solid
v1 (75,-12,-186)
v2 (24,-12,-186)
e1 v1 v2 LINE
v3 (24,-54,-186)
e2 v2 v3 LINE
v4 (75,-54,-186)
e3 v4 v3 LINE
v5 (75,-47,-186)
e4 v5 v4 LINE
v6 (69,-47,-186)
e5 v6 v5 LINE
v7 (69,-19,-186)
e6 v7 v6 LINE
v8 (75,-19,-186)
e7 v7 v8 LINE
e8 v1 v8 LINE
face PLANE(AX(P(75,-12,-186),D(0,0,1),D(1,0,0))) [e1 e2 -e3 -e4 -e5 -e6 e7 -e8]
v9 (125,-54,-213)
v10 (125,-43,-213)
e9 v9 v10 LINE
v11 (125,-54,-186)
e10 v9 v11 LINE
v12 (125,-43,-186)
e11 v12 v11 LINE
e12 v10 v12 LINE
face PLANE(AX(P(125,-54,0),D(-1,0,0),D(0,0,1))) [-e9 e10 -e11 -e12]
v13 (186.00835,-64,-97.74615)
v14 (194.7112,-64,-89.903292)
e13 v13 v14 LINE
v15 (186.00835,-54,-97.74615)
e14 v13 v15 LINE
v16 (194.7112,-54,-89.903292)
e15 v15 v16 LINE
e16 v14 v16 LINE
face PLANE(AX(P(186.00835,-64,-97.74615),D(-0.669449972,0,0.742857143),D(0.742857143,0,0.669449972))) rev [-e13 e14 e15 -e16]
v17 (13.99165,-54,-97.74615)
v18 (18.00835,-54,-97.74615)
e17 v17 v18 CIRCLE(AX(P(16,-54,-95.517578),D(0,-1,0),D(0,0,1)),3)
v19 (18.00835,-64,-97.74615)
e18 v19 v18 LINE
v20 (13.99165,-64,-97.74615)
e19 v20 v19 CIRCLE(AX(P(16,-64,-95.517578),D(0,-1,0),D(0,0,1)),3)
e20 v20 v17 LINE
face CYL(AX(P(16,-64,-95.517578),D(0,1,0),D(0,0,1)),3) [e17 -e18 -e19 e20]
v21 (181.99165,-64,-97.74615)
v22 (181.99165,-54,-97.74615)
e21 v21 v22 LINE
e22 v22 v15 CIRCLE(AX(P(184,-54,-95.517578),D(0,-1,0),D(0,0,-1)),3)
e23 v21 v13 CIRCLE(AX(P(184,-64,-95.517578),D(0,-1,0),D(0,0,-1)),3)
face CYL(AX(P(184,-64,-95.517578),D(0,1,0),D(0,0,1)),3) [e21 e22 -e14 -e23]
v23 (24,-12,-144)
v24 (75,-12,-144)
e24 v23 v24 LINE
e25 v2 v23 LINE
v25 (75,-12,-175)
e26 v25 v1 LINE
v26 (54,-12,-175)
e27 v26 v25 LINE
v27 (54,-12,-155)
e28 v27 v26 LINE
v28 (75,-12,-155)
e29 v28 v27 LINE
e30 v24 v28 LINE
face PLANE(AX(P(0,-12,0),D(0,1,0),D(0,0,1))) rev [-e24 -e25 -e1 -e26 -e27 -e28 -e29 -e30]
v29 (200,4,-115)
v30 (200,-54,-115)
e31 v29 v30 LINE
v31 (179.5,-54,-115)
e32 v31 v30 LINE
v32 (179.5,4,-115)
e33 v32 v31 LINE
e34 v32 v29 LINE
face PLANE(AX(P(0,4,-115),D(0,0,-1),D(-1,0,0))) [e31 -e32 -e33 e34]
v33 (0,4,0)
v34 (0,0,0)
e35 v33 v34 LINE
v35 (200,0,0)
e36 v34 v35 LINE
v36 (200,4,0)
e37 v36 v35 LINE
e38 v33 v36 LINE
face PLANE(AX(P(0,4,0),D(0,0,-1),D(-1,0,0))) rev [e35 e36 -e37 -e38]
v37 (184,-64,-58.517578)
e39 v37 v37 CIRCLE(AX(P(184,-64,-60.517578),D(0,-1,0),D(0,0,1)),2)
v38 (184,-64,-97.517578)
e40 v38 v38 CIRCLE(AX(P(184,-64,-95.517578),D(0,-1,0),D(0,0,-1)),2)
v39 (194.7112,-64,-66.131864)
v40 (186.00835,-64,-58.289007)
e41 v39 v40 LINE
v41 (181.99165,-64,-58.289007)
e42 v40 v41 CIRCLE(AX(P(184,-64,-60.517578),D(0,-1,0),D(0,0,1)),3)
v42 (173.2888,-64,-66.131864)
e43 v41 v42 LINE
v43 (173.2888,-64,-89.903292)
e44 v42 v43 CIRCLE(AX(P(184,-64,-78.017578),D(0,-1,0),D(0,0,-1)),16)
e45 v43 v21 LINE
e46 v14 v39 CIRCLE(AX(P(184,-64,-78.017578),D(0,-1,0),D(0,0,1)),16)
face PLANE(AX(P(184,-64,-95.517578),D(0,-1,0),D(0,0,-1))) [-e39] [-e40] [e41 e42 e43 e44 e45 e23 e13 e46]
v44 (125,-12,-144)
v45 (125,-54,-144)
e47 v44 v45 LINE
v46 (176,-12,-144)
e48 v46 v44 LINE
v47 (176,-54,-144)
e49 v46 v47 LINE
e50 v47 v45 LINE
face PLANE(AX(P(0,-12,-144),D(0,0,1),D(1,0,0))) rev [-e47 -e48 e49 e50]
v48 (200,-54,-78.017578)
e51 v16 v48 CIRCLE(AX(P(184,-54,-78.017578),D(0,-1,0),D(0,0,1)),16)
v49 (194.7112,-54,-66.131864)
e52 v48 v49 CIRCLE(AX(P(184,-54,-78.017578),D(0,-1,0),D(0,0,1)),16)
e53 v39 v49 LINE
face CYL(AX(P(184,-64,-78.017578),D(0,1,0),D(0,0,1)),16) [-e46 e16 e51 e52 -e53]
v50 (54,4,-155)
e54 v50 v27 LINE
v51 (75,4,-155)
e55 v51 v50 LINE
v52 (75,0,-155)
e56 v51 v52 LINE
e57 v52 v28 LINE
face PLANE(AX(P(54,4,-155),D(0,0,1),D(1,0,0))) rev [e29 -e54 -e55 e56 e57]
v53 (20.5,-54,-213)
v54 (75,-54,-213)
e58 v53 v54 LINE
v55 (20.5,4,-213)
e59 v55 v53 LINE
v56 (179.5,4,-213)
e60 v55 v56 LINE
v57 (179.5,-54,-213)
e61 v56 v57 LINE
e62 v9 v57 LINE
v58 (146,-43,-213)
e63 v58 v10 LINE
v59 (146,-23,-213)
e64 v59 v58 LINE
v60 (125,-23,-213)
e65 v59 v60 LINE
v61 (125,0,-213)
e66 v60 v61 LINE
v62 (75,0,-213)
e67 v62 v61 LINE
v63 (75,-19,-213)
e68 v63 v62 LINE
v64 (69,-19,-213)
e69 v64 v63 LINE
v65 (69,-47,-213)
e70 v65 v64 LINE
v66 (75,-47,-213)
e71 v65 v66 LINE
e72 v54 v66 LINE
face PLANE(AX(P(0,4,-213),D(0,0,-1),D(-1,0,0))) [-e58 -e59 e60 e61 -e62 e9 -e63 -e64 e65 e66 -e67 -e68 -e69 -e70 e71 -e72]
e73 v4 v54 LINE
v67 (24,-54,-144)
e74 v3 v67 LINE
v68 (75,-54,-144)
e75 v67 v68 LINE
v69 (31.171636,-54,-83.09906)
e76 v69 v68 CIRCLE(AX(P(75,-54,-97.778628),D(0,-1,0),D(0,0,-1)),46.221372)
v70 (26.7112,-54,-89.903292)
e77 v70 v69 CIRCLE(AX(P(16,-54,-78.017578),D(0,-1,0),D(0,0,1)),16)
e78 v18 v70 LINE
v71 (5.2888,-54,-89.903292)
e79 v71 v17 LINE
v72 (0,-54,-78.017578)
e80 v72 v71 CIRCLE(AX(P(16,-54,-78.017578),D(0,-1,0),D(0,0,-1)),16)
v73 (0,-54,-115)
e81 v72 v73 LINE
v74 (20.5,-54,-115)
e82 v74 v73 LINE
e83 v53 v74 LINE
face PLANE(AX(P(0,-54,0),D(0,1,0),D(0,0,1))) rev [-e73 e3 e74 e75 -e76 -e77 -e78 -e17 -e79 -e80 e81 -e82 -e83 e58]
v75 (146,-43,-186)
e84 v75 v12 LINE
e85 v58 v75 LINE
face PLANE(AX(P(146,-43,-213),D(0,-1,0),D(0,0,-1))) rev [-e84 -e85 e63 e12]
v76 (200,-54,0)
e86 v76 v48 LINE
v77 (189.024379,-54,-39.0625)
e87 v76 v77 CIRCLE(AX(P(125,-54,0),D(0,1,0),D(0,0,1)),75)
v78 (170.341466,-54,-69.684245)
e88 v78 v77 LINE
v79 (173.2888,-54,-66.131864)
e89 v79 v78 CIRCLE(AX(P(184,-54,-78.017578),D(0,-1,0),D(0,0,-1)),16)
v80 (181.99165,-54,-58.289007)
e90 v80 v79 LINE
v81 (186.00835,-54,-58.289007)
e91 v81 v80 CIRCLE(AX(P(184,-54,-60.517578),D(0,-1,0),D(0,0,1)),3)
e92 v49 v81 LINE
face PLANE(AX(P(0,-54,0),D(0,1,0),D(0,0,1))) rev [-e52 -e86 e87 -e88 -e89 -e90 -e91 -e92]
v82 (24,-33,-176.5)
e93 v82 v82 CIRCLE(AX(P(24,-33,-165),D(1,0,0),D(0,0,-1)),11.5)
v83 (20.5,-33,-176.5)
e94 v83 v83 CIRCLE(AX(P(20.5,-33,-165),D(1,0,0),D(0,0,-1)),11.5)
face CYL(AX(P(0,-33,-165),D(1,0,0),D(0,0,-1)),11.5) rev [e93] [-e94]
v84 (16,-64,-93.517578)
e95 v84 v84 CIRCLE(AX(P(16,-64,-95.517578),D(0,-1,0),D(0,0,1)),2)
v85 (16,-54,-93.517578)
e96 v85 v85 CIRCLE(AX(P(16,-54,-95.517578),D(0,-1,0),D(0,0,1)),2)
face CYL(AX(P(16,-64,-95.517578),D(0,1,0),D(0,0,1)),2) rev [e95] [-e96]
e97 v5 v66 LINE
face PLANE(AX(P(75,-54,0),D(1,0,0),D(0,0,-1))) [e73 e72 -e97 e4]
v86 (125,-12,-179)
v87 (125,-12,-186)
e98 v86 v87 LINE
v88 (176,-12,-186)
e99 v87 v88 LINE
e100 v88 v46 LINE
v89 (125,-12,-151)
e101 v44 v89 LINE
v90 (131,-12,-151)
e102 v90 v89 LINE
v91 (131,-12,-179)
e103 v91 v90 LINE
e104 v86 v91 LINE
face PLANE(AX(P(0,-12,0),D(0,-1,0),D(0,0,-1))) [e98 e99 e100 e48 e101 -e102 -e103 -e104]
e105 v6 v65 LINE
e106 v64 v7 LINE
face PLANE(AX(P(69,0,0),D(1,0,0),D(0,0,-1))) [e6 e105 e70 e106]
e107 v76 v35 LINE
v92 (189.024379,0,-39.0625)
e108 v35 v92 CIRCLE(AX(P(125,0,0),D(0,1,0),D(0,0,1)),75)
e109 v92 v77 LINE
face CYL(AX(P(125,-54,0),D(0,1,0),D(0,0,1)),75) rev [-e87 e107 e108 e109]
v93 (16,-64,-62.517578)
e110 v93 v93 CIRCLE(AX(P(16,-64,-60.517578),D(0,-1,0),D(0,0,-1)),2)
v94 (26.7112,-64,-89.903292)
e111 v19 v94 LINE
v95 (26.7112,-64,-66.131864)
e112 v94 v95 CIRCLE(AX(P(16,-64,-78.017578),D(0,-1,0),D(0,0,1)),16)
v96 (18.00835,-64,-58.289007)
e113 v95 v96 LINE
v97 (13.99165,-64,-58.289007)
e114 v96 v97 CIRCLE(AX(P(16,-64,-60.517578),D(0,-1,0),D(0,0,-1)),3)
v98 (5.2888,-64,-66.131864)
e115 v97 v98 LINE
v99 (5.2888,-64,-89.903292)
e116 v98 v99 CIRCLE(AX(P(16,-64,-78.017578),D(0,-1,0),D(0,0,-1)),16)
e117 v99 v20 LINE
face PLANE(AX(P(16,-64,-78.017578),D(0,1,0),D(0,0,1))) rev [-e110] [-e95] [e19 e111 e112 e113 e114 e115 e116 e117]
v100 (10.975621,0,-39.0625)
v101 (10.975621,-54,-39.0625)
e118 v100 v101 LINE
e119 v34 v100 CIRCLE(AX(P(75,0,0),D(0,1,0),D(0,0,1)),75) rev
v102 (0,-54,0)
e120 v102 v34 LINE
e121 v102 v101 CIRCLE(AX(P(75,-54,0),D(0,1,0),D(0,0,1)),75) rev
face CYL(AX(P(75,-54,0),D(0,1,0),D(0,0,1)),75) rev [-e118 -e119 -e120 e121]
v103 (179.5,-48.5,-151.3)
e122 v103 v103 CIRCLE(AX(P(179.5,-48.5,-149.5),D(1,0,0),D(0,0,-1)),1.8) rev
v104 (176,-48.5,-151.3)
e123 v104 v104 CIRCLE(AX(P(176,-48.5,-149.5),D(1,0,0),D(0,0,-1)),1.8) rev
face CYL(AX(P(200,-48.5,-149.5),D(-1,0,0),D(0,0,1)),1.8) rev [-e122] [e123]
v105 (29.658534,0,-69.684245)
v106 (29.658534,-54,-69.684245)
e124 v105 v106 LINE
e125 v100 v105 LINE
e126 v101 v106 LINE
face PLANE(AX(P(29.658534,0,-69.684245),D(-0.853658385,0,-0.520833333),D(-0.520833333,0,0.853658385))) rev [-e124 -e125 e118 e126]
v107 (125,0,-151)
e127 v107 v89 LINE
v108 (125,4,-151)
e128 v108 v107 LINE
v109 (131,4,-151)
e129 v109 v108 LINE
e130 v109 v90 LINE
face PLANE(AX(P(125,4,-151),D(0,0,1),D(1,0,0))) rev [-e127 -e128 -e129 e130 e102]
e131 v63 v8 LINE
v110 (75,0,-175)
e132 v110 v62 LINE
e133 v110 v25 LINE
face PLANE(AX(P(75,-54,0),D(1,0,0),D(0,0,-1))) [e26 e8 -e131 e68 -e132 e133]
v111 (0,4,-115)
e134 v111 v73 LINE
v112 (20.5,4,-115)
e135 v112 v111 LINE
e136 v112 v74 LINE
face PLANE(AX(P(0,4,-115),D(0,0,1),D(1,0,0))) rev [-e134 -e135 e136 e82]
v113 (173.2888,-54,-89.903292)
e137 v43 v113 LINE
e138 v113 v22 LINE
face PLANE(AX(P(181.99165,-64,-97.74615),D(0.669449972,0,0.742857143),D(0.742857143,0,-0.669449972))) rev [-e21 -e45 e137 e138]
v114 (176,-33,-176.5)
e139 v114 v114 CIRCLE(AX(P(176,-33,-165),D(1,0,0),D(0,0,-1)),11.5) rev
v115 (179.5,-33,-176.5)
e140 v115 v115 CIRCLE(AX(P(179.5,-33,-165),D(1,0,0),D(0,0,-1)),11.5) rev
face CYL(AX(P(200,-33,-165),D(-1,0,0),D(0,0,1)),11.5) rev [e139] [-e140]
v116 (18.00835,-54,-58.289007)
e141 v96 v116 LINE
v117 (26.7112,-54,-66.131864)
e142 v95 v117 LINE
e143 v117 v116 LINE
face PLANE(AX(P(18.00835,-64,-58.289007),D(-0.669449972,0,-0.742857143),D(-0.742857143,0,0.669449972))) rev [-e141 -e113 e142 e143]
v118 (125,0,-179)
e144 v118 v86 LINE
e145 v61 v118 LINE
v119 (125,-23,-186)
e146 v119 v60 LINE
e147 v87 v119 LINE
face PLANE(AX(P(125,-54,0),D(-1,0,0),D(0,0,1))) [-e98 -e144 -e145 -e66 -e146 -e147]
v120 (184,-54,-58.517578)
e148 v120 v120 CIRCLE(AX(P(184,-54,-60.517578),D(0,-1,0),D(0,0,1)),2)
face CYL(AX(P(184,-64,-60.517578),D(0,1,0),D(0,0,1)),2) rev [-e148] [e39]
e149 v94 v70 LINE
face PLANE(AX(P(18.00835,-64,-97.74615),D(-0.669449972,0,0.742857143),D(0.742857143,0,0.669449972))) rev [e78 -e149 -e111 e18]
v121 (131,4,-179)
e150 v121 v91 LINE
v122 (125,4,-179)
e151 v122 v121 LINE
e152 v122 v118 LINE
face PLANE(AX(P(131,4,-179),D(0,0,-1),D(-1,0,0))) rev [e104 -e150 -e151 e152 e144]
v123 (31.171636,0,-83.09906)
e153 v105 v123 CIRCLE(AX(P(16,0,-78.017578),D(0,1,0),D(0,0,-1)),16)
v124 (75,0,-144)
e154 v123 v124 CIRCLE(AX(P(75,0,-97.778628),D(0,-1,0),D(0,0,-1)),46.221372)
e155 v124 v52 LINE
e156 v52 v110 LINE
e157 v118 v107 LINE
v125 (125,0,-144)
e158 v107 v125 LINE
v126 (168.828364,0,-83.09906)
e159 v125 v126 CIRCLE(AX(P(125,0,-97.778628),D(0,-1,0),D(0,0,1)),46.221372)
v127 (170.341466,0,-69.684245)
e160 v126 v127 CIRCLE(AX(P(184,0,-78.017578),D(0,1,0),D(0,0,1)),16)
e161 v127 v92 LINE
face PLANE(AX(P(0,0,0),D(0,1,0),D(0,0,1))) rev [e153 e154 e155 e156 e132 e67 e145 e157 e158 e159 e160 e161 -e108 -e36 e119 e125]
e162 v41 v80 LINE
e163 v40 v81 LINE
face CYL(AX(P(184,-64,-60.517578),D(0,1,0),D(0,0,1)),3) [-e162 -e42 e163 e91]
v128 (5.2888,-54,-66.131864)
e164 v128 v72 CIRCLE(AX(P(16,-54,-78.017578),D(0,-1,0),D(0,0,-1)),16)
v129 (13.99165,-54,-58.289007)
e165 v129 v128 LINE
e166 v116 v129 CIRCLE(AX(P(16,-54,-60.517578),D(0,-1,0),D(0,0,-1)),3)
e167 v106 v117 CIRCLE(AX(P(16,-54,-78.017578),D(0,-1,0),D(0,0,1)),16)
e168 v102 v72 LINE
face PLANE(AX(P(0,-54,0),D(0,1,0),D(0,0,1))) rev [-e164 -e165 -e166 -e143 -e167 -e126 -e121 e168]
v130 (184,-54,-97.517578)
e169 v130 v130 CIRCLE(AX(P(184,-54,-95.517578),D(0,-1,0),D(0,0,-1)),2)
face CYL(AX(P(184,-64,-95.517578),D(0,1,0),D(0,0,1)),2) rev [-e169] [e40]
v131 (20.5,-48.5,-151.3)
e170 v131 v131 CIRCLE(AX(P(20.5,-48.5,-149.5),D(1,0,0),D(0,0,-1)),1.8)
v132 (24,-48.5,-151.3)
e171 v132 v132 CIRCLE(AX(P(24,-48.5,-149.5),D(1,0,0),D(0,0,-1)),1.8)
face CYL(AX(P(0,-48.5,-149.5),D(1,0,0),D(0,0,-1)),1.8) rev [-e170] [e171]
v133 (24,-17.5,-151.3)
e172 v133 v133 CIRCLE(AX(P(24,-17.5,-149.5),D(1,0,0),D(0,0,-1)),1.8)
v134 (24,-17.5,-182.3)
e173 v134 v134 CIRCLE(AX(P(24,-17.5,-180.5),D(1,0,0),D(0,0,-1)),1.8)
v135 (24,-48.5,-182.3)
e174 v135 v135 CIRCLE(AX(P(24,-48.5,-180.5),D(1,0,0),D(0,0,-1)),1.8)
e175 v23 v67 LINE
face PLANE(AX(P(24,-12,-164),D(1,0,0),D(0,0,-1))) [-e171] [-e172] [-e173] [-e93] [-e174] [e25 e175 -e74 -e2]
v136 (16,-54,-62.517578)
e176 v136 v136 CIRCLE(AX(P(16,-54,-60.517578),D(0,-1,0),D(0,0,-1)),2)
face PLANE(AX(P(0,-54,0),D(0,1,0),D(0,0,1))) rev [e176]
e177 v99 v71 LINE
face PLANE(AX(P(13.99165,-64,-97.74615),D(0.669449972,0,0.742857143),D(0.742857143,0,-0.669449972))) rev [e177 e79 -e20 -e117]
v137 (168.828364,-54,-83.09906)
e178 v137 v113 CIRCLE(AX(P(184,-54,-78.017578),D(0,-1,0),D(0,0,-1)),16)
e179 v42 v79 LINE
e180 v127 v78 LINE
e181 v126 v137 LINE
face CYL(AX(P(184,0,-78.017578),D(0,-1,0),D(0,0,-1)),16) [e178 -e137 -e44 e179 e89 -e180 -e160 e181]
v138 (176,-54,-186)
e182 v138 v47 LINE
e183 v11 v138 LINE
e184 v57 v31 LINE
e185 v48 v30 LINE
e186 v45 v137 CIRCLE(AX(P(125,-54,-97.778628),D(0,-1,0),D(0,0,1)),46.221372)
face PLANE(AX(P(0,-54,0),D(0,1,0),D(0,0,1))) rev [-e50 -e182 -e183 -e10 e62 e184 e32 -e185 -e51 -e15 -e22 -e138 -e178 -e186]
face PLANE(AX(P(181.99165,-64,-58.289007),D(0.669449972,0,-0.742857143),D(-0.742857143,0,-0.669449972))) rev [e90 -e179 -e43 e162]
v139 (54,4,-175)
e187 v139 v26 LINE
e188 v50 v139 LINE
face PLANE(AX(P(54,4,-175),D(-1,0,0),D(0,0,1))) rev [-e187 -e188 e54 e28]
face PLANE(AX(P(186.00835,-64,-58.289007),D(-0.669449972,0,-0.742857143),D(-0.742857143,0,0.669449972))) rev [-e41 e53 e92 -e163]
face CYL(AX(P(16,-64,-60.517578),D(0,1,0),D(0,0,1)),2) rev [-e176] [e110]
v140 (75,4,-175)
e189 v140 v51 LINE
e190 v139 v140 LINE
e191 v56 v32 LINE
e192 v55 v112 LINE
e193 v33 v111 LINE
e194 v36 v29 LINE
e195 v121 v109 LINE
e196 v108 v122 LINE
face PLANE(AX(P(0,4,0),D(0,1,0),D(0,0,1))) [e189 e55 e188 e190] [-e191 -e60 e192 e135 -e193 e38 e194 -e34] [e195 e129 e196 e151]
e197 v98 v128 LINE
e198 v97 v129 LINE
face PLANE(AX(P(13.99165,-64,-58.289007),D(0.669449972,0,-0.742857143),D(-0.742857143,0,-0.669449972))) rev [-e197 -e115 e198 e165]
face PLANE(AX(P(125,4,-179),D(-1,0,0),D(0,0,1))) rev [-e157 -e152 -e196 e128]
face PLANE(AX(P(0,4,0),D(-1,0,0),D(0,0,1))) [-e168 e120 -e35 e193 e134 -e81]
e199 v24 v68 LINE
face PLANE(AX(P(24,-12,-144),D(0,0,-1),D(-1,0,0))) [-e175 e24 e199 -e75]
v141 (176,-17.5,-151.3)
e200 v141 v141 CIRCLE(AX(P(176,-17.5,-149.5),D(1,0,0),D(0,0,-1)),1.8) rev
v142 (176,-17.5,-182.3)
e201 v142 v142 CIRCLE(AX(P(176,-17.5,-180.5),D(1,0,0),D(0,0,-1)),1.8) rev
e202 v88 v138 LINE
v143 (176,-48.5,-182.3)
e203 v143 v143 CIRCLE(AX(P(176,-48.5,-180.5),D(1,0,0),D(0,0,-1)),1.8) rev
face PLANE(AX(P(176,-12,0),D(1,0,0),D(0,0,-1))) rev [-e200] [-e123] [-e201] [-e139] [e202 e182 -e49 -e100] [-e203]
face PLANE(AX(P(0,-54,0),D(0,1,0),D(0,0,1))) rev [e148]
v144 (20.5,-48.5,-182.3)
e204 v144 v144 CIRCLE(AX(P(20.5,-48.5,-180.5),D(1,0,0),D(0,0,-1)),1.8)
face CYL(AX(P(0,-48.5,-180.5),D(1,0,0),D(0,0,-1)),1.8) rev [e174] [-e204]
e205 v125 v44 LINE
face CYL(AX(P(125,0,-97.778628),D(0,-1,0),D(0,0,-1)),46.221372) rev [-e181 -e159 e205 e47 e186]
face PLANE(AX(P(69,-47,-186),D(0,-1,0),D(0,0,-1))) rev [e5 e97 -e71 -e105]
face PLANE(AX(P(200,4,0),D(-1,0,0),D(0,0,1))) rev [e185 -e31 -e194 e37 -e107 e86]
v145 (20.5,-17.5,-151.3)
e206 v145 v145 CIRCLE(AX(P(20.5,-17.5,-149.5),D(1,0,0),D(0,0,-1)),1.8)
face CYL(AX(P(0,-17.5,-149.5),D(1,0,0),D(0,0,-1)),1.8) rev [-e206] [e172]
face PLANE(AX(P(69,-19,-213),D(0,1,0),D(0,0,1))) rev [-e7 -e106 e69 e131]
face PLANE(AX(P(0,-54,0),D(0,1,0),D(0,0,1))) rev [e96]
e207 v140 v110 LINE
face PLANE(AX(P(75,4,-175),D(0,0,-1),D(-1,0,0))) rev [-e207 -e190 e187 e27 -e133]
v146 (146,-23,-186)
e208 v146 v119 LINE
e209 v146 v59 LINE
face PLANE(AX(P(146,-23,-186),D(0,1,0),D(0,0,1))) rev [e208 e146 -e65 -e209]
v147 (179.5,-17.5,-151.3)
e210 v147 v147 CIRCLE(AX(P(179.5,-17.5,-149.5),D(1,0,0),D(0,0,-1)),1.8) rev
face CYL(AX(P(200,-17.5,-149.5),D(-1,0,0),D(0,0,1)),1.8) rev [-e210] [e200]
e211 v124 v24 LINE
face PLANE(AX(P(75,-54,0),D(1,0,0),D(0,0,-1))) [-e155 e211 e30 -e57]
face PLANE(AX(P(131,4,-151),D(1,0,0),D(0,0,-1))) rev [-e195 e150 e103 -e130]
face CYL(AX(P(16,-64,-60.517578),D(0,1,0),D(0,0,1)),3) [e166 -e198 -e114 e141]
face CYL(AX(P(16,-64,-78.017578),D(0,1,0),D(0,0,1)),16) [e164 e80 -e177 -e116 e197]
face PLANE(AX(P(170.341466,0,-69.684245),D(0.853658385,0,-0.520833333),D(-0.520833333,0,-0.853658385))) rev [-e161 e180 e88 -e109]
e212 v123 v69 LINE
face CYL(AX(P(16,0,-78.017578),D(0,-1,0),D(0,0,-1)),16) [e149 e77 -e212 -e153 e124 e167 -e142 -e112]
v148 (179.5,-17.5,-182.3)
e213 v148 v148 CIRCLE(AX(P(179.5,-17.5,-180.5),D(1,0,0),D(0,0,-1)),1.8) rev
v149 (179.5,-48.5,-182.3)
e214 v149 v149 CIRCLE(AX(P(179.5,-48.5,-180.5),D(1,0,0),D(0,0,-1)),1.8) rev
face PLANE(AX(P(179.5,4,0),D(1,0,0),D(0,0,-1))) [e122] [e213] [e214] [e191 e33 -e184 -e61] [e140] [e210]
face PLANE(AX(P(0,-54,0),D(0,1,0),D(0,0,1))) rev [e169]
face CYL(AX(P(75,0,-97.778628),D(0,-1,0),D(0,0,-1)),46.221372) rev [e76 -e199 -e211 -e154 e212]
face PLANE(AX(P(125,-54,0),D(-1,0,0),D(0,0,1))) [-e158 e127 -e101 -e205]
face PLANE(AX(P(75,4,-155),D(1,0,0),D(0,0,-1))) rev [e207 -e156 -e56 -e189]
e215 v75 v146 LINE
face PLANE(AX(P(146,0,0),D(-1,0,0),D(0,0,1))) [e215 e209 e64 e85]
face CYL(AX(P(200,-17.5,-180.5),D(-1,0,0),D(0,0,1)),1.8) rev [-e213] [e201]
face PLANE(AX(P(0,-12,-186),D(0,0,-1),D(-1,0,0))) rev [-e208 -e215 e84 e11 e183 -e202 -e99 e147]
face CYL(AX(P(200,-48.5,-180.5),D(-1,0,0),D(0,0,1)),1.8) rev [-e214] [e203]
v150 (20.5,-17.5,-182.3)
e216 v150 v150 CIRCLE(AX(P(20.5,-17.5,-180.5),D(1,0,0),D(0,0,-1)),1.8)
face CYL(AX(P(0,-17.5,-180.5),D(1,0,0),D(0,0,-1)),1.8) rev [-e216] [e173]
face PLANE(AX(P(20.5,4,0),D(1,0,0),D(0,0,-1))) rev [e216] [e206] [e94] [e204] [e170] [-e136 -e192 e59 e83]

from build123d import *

# Parameters (mm, degrees)
SKETCH_1_W           = 200
SKETCH_1_H           = 213
EXTRUDE_1_DEPTH      = 4
EXTRUDE_2_DEPTH      = 54
CUT_EXTRUDE_2_DEPTH  = 298.880848663
CUT_EXTRUDE_3_DEPTH  = 42
SKETCH_7_R           = 1.8
SKETCH_7_R_2         = 11.5
CUT_EXTRUDE_4_DEPTH  = 282.53330176
MIRROR_START         = 176
MIRROR_1_OUTLINE_R   = 1.8
MIRROR_1_OUTLINE_R_2 = 11.5
MIRROR_1_DEPTH       = 3.5
SKETCH_8_W           = 27
SKETCH_8_H           = 28
CUT_EXTRUDE_5_DEPTH  = 6
SKETCH_9_W           = 27
SKETCH_9_H           = 20
CUT_EXTRUDE_6_DEPTH  = 21
CUT_EXTRUDE_START    = -54
CUT_EXTRUDE_7_DEPTH  = 54
SKETCH_12_R          = 2
EXTRUDE_3_DEPTH      = 10
SKETCH_14_W          = 21
SKETCH_14_H          = 20
CUT_EXTRUDE_8_DEPTH  = 297.770955452
SKETCH_15_W          = 6
SKETCH_15_H          = 28
CUT_EXTRUDE_9_DEPTH  = 297.770955452


# Read off the part's stored shape, not the designer's step: 镜向1
with BuildPart() as part:
    # 草图1 → 凸台-拉伸1 (new body)
    with BuildSketch(Plane(origin=(0, 0, 0), x_dir=(1, 0, 0), z_dir=(0, 1, 0))):
        with Locations((100, 106.5)):
            Rectangle(SKETCH_1_W, SKETCH_1_H)
    extrude(amount=EXTRUDE_1_DEPTH)

    # 草图1<4> → 凸台-拉伸2 (add)
    with BuildSketch(Plane(origin=(0, 0, 0), x_dir=(1, 0, 0), z_dir=(0, 1, 0))):
        with BuildLine():
            Line((0, 213), (0, 0))
            ThreePointArc((0, 0), (21.966991411, 53.033008589), (75, 75))
            Line((75, 75), (75, 213))
            Line((75, 213), (0, 213))
        make_face()
        with BuildLine():
            Line((125, 213), (125, 75))
            ThreePointArc((125, 75), (178.033008589, 53.033008589), (200, 0))
            Line((200, 0), (200, 213))
            Line((200, 213), (125, 213))
        make_face()
    extrude(amount=-EXTRUDE_2_DEPTH)

    # 草图3 → 切除-拉伸2 (cut, through all)
    with BuildSketch(Plane.XZ.offset(54)):
        Polygon((20.5, -186), (20.5, -165), (20.5, -144), (20.5, -115), (0, -115), (0, -213), (20.5, -213), align=None)
        Polygon((179.5, -115), (200, -115), (200, -213), (179.5, -213), (179.5, -165), align=None)
    extrude(amount=-CUT_EXTRUDE_2_DEPTH, mode=Mode.SUBTRACT)

    # 草图5 → 切除-拉伸3 (cut)
    with BuildSketch(Plane.XZ.offset(54)):
        Polygon((176, -164), (176, -144), (125, -144), (125, -186), (176, -186), align=None)
        Polygon((24, -164), (24, -144), (75, -144), (75, -186), (24, -186), align=None)
    extrude(amount=-CUT_EXTRUDE_3_DEPTH, mode=Mode.SUBTRACT)

    # 草图7 → 切除-拉伸4 (cut, through all)
    with BuildSketch(Plane(origin=(24, 0, 0), x_dir=(0, 0, -1), z_dir=(1, 0, 0))):
        with Locations((180.5, -17.5)):
            Circle(SKETCH_7_R)
        with Locations((149.5, -17.5)):
            Circle(SKETCH_7_R)
        with Locations((165, -33)):
            Circle(SKETCH_7_R_2)
        with Locations((180.5, -48.5)):
            Circle(SKETCH_7_R)
        with Locations((149.5, -48.5)):
            Circle(SKETCH_7_R)
    extrude(amount=-CUT_EXTRUDE_4_DEPTH, mode=Mode.SUBTRACT)

    # 镜向1 outline → 镜向1 (cut)
    with BuildSketch(Plane.YZ.offset(MIRROR_START)):
        with Locations((-17.5, -180.5)):
            Circle(MIRROR_1_OUTLINE_R)
        with Locations((-17.5, -149.5)):
            Circle(MIRROR_1_OUTLINE_R)
        with Locations((-33, -165)):
            Circle(MIRROR_1_OUTLINE_R_2)
        with Locations((-48.5, -180.5)):
            Circle(MIRROR_1_OUTLINE_R)
        with Locations((-48.5, -149.5)):
            Circle(MIRROR_1_OUTLINE_R)
    extrude(amount=MIRROR_1_DEPTH, mode=Mode.SUBTRACT)

    # 草图8 → 切除-拉伸5 (cut)
    with BuildSketch(Plane(origin=(75, 0, 0), x_dir=(0, 0, -1), z_dir=(1, 0, 0))):
        with Locations((199.5, -33)):
            Rectangle(SKETCH_8_W, SKETCH_8_H)
    extrude(amount=-CUT_EXTRUDE_5_DEPTH, mode=Mode.SUBTRACT)

    # 草图9 → 切除-拉伸6 (cut)
    with BuildSketch(Plane.ZY.offset(-125)):
        with Locations((-199.5, -33)):
            Rectangle(SKETCH_9_W, SKETCH_9_H)
    extrude(amount=-CUT_EXTRUDE_6_DEPTH, mode=Mode.SUBTRACT)

    # 草图11 → 切除-拉伸7 (cut)
    with BuildSketch(Plane.XZ.offset(54).offset(CUT_EXTRUDE_START)):
        with BuildLine():
            Line((29.658534166, -69.684244774), (10.975621098, -39.0625))
            ThreePointArc((10.975621098, -39.0625), (38.289562111, -65.401404801), (75, -75))
            Line((75, -75), (75, -144))
            ThreePointArc((75, -144), (37.483837038, -124.777752739), (31.171635941, -83.099060455))
            ThreePointArc((31.171635941, -83.099060455), (31.899182276, -76.224256342), (29.658534166, -69.684244774))
        make_face()
        with BuildLine():
            Line((125, -144), (125, -75))
            ThreePointArc((125, -75), (161.710437889, -65.401404801), (189.024378902, -39.0625))
            Line((189.024378902, -39.0625), (170.341465834, -69.684244774))
            ThreePointArc((170.341465834, -69.684244774), (168.100817724, -76.224256342), (168.828364059, -83.099060455))
            ThreePointArc((168.828364059, -83.099060455), (162.516162962, -124.777752739), (125, -144))
        make_face()
    extrude(amount=CUT_EXTRUDE_7_DEPTH, mode=Mode.SUBTRACT)

    # 草图12 → 凸台-拉伸3 (add)
    # profile 1 of 2: a face of its own
    with BuildSketch(Plane.XZ.offset(54)):
        with BuildLine():
            Line((18.008349917, -58.289006678), (26.711199556, -66.131863821))
            ThreePointArc((26.711199556, -66.131863821), (32, -78.017578107), (26.711199556, -89.903292393))
            Line((26.711199556, -89.903292393), (18.008349917, -97.746149535))
            ThreePointArc((18.008349917, -97.746149535), (16, -98.517578107), (13.991650083, -97.746149535))
            Line((13.991650083, -97.746149535), (5.288800444, -89.903292393))
            ThreePointArc((5.288800444, -89.903292393), (0, -78.017578107), (5.288800444, -66.131863821))
            Line((5.288800444, -66.131863821), (13.991650083, -58.289006678))
            ThreePointArc((13.991650083, -58.289006678), (16, -57.517578107), (18.008349917, -58.289006678))
        make_face()
        with Locations(Location((16, -60.517578107, 0), (0, 0, 270))):
            Circle(SKETCH_12_R, mode=Mode.SUBTRACT)
        with Locations(Location((16, -95.517578107, 0), (0, 0, 90))):
            Circle(SKETCH_12_R, mode=Mode.SUBTRACT)
    # profile 2 of 2: a face of its own
    with BuildSketch(Plane.XZ.offset(54)):
        with BuildLine():
            Line((186.008349917, -97.746149535), (194.711199556, -89.903292393))
            ThreePointArc((194.711199556, -89.903292393), (200, -78.017578107), (194.711199556, -66.131863821))
            Line((194.711199556, -66.131863821), (186.008349917, -58.289006678))
            ThreePointArc((186.008349917, -58.289006678), (184, -57.517578107), (181.991650083, -58.289006678))
            Line((181.991650083, -58.289006678), (173.288800444, -66.131863821))
            ThreePointArc((173.288800444, -66.131863821), (168, -78.017578107), (173.288800444, -89.903292393))
            Line((173.288800444, -89.903292393), (181.991650083, -97.746149535))
            ThreePointArc((181.991650083, -97.746149535), (184, -98.517578107), (186.008349917, -97.746149535))
        make_face()
        with Locations(Location((184, -95.517578107, 0), (0, 0, 270))):
            Circle(SKETCH_12_R, mode=Mode.SUBTRACT)
        with Locations(Location((184, -60.517578107, 0), (0, 0, 90))):
            Circle(SKETCH_12_R, mode=Mode.SUBTRACT)
    extrude(amount=EXTRUDE_3_DEPTH)

    # 草图14 → 切除-拉伸8 (cut, through all)
    with BuildSketch(Plane.XZ.offset(12)):
        with Locations((64.5, -165)):
            Rectangle(SKETCH_14_W, SKETCH_14_H)
    extrude(amount=-CUT_EXTRUDE_8_DEPTH, mode=Mode.SUBTRACT)

    # 草图15 → 切除-拉伸9 (cut, through all)
    with BuildSketch(Plane.XZ.offset(12)):
        with Locations((128, -165)):
            Rectangle(SKETCH_15_W, SKETCH_15_H)
    extrude(amount=-CUT_EXTRUDE_9_DEPTH, mode=Mode.SUBTRACT)


solid = part.part
